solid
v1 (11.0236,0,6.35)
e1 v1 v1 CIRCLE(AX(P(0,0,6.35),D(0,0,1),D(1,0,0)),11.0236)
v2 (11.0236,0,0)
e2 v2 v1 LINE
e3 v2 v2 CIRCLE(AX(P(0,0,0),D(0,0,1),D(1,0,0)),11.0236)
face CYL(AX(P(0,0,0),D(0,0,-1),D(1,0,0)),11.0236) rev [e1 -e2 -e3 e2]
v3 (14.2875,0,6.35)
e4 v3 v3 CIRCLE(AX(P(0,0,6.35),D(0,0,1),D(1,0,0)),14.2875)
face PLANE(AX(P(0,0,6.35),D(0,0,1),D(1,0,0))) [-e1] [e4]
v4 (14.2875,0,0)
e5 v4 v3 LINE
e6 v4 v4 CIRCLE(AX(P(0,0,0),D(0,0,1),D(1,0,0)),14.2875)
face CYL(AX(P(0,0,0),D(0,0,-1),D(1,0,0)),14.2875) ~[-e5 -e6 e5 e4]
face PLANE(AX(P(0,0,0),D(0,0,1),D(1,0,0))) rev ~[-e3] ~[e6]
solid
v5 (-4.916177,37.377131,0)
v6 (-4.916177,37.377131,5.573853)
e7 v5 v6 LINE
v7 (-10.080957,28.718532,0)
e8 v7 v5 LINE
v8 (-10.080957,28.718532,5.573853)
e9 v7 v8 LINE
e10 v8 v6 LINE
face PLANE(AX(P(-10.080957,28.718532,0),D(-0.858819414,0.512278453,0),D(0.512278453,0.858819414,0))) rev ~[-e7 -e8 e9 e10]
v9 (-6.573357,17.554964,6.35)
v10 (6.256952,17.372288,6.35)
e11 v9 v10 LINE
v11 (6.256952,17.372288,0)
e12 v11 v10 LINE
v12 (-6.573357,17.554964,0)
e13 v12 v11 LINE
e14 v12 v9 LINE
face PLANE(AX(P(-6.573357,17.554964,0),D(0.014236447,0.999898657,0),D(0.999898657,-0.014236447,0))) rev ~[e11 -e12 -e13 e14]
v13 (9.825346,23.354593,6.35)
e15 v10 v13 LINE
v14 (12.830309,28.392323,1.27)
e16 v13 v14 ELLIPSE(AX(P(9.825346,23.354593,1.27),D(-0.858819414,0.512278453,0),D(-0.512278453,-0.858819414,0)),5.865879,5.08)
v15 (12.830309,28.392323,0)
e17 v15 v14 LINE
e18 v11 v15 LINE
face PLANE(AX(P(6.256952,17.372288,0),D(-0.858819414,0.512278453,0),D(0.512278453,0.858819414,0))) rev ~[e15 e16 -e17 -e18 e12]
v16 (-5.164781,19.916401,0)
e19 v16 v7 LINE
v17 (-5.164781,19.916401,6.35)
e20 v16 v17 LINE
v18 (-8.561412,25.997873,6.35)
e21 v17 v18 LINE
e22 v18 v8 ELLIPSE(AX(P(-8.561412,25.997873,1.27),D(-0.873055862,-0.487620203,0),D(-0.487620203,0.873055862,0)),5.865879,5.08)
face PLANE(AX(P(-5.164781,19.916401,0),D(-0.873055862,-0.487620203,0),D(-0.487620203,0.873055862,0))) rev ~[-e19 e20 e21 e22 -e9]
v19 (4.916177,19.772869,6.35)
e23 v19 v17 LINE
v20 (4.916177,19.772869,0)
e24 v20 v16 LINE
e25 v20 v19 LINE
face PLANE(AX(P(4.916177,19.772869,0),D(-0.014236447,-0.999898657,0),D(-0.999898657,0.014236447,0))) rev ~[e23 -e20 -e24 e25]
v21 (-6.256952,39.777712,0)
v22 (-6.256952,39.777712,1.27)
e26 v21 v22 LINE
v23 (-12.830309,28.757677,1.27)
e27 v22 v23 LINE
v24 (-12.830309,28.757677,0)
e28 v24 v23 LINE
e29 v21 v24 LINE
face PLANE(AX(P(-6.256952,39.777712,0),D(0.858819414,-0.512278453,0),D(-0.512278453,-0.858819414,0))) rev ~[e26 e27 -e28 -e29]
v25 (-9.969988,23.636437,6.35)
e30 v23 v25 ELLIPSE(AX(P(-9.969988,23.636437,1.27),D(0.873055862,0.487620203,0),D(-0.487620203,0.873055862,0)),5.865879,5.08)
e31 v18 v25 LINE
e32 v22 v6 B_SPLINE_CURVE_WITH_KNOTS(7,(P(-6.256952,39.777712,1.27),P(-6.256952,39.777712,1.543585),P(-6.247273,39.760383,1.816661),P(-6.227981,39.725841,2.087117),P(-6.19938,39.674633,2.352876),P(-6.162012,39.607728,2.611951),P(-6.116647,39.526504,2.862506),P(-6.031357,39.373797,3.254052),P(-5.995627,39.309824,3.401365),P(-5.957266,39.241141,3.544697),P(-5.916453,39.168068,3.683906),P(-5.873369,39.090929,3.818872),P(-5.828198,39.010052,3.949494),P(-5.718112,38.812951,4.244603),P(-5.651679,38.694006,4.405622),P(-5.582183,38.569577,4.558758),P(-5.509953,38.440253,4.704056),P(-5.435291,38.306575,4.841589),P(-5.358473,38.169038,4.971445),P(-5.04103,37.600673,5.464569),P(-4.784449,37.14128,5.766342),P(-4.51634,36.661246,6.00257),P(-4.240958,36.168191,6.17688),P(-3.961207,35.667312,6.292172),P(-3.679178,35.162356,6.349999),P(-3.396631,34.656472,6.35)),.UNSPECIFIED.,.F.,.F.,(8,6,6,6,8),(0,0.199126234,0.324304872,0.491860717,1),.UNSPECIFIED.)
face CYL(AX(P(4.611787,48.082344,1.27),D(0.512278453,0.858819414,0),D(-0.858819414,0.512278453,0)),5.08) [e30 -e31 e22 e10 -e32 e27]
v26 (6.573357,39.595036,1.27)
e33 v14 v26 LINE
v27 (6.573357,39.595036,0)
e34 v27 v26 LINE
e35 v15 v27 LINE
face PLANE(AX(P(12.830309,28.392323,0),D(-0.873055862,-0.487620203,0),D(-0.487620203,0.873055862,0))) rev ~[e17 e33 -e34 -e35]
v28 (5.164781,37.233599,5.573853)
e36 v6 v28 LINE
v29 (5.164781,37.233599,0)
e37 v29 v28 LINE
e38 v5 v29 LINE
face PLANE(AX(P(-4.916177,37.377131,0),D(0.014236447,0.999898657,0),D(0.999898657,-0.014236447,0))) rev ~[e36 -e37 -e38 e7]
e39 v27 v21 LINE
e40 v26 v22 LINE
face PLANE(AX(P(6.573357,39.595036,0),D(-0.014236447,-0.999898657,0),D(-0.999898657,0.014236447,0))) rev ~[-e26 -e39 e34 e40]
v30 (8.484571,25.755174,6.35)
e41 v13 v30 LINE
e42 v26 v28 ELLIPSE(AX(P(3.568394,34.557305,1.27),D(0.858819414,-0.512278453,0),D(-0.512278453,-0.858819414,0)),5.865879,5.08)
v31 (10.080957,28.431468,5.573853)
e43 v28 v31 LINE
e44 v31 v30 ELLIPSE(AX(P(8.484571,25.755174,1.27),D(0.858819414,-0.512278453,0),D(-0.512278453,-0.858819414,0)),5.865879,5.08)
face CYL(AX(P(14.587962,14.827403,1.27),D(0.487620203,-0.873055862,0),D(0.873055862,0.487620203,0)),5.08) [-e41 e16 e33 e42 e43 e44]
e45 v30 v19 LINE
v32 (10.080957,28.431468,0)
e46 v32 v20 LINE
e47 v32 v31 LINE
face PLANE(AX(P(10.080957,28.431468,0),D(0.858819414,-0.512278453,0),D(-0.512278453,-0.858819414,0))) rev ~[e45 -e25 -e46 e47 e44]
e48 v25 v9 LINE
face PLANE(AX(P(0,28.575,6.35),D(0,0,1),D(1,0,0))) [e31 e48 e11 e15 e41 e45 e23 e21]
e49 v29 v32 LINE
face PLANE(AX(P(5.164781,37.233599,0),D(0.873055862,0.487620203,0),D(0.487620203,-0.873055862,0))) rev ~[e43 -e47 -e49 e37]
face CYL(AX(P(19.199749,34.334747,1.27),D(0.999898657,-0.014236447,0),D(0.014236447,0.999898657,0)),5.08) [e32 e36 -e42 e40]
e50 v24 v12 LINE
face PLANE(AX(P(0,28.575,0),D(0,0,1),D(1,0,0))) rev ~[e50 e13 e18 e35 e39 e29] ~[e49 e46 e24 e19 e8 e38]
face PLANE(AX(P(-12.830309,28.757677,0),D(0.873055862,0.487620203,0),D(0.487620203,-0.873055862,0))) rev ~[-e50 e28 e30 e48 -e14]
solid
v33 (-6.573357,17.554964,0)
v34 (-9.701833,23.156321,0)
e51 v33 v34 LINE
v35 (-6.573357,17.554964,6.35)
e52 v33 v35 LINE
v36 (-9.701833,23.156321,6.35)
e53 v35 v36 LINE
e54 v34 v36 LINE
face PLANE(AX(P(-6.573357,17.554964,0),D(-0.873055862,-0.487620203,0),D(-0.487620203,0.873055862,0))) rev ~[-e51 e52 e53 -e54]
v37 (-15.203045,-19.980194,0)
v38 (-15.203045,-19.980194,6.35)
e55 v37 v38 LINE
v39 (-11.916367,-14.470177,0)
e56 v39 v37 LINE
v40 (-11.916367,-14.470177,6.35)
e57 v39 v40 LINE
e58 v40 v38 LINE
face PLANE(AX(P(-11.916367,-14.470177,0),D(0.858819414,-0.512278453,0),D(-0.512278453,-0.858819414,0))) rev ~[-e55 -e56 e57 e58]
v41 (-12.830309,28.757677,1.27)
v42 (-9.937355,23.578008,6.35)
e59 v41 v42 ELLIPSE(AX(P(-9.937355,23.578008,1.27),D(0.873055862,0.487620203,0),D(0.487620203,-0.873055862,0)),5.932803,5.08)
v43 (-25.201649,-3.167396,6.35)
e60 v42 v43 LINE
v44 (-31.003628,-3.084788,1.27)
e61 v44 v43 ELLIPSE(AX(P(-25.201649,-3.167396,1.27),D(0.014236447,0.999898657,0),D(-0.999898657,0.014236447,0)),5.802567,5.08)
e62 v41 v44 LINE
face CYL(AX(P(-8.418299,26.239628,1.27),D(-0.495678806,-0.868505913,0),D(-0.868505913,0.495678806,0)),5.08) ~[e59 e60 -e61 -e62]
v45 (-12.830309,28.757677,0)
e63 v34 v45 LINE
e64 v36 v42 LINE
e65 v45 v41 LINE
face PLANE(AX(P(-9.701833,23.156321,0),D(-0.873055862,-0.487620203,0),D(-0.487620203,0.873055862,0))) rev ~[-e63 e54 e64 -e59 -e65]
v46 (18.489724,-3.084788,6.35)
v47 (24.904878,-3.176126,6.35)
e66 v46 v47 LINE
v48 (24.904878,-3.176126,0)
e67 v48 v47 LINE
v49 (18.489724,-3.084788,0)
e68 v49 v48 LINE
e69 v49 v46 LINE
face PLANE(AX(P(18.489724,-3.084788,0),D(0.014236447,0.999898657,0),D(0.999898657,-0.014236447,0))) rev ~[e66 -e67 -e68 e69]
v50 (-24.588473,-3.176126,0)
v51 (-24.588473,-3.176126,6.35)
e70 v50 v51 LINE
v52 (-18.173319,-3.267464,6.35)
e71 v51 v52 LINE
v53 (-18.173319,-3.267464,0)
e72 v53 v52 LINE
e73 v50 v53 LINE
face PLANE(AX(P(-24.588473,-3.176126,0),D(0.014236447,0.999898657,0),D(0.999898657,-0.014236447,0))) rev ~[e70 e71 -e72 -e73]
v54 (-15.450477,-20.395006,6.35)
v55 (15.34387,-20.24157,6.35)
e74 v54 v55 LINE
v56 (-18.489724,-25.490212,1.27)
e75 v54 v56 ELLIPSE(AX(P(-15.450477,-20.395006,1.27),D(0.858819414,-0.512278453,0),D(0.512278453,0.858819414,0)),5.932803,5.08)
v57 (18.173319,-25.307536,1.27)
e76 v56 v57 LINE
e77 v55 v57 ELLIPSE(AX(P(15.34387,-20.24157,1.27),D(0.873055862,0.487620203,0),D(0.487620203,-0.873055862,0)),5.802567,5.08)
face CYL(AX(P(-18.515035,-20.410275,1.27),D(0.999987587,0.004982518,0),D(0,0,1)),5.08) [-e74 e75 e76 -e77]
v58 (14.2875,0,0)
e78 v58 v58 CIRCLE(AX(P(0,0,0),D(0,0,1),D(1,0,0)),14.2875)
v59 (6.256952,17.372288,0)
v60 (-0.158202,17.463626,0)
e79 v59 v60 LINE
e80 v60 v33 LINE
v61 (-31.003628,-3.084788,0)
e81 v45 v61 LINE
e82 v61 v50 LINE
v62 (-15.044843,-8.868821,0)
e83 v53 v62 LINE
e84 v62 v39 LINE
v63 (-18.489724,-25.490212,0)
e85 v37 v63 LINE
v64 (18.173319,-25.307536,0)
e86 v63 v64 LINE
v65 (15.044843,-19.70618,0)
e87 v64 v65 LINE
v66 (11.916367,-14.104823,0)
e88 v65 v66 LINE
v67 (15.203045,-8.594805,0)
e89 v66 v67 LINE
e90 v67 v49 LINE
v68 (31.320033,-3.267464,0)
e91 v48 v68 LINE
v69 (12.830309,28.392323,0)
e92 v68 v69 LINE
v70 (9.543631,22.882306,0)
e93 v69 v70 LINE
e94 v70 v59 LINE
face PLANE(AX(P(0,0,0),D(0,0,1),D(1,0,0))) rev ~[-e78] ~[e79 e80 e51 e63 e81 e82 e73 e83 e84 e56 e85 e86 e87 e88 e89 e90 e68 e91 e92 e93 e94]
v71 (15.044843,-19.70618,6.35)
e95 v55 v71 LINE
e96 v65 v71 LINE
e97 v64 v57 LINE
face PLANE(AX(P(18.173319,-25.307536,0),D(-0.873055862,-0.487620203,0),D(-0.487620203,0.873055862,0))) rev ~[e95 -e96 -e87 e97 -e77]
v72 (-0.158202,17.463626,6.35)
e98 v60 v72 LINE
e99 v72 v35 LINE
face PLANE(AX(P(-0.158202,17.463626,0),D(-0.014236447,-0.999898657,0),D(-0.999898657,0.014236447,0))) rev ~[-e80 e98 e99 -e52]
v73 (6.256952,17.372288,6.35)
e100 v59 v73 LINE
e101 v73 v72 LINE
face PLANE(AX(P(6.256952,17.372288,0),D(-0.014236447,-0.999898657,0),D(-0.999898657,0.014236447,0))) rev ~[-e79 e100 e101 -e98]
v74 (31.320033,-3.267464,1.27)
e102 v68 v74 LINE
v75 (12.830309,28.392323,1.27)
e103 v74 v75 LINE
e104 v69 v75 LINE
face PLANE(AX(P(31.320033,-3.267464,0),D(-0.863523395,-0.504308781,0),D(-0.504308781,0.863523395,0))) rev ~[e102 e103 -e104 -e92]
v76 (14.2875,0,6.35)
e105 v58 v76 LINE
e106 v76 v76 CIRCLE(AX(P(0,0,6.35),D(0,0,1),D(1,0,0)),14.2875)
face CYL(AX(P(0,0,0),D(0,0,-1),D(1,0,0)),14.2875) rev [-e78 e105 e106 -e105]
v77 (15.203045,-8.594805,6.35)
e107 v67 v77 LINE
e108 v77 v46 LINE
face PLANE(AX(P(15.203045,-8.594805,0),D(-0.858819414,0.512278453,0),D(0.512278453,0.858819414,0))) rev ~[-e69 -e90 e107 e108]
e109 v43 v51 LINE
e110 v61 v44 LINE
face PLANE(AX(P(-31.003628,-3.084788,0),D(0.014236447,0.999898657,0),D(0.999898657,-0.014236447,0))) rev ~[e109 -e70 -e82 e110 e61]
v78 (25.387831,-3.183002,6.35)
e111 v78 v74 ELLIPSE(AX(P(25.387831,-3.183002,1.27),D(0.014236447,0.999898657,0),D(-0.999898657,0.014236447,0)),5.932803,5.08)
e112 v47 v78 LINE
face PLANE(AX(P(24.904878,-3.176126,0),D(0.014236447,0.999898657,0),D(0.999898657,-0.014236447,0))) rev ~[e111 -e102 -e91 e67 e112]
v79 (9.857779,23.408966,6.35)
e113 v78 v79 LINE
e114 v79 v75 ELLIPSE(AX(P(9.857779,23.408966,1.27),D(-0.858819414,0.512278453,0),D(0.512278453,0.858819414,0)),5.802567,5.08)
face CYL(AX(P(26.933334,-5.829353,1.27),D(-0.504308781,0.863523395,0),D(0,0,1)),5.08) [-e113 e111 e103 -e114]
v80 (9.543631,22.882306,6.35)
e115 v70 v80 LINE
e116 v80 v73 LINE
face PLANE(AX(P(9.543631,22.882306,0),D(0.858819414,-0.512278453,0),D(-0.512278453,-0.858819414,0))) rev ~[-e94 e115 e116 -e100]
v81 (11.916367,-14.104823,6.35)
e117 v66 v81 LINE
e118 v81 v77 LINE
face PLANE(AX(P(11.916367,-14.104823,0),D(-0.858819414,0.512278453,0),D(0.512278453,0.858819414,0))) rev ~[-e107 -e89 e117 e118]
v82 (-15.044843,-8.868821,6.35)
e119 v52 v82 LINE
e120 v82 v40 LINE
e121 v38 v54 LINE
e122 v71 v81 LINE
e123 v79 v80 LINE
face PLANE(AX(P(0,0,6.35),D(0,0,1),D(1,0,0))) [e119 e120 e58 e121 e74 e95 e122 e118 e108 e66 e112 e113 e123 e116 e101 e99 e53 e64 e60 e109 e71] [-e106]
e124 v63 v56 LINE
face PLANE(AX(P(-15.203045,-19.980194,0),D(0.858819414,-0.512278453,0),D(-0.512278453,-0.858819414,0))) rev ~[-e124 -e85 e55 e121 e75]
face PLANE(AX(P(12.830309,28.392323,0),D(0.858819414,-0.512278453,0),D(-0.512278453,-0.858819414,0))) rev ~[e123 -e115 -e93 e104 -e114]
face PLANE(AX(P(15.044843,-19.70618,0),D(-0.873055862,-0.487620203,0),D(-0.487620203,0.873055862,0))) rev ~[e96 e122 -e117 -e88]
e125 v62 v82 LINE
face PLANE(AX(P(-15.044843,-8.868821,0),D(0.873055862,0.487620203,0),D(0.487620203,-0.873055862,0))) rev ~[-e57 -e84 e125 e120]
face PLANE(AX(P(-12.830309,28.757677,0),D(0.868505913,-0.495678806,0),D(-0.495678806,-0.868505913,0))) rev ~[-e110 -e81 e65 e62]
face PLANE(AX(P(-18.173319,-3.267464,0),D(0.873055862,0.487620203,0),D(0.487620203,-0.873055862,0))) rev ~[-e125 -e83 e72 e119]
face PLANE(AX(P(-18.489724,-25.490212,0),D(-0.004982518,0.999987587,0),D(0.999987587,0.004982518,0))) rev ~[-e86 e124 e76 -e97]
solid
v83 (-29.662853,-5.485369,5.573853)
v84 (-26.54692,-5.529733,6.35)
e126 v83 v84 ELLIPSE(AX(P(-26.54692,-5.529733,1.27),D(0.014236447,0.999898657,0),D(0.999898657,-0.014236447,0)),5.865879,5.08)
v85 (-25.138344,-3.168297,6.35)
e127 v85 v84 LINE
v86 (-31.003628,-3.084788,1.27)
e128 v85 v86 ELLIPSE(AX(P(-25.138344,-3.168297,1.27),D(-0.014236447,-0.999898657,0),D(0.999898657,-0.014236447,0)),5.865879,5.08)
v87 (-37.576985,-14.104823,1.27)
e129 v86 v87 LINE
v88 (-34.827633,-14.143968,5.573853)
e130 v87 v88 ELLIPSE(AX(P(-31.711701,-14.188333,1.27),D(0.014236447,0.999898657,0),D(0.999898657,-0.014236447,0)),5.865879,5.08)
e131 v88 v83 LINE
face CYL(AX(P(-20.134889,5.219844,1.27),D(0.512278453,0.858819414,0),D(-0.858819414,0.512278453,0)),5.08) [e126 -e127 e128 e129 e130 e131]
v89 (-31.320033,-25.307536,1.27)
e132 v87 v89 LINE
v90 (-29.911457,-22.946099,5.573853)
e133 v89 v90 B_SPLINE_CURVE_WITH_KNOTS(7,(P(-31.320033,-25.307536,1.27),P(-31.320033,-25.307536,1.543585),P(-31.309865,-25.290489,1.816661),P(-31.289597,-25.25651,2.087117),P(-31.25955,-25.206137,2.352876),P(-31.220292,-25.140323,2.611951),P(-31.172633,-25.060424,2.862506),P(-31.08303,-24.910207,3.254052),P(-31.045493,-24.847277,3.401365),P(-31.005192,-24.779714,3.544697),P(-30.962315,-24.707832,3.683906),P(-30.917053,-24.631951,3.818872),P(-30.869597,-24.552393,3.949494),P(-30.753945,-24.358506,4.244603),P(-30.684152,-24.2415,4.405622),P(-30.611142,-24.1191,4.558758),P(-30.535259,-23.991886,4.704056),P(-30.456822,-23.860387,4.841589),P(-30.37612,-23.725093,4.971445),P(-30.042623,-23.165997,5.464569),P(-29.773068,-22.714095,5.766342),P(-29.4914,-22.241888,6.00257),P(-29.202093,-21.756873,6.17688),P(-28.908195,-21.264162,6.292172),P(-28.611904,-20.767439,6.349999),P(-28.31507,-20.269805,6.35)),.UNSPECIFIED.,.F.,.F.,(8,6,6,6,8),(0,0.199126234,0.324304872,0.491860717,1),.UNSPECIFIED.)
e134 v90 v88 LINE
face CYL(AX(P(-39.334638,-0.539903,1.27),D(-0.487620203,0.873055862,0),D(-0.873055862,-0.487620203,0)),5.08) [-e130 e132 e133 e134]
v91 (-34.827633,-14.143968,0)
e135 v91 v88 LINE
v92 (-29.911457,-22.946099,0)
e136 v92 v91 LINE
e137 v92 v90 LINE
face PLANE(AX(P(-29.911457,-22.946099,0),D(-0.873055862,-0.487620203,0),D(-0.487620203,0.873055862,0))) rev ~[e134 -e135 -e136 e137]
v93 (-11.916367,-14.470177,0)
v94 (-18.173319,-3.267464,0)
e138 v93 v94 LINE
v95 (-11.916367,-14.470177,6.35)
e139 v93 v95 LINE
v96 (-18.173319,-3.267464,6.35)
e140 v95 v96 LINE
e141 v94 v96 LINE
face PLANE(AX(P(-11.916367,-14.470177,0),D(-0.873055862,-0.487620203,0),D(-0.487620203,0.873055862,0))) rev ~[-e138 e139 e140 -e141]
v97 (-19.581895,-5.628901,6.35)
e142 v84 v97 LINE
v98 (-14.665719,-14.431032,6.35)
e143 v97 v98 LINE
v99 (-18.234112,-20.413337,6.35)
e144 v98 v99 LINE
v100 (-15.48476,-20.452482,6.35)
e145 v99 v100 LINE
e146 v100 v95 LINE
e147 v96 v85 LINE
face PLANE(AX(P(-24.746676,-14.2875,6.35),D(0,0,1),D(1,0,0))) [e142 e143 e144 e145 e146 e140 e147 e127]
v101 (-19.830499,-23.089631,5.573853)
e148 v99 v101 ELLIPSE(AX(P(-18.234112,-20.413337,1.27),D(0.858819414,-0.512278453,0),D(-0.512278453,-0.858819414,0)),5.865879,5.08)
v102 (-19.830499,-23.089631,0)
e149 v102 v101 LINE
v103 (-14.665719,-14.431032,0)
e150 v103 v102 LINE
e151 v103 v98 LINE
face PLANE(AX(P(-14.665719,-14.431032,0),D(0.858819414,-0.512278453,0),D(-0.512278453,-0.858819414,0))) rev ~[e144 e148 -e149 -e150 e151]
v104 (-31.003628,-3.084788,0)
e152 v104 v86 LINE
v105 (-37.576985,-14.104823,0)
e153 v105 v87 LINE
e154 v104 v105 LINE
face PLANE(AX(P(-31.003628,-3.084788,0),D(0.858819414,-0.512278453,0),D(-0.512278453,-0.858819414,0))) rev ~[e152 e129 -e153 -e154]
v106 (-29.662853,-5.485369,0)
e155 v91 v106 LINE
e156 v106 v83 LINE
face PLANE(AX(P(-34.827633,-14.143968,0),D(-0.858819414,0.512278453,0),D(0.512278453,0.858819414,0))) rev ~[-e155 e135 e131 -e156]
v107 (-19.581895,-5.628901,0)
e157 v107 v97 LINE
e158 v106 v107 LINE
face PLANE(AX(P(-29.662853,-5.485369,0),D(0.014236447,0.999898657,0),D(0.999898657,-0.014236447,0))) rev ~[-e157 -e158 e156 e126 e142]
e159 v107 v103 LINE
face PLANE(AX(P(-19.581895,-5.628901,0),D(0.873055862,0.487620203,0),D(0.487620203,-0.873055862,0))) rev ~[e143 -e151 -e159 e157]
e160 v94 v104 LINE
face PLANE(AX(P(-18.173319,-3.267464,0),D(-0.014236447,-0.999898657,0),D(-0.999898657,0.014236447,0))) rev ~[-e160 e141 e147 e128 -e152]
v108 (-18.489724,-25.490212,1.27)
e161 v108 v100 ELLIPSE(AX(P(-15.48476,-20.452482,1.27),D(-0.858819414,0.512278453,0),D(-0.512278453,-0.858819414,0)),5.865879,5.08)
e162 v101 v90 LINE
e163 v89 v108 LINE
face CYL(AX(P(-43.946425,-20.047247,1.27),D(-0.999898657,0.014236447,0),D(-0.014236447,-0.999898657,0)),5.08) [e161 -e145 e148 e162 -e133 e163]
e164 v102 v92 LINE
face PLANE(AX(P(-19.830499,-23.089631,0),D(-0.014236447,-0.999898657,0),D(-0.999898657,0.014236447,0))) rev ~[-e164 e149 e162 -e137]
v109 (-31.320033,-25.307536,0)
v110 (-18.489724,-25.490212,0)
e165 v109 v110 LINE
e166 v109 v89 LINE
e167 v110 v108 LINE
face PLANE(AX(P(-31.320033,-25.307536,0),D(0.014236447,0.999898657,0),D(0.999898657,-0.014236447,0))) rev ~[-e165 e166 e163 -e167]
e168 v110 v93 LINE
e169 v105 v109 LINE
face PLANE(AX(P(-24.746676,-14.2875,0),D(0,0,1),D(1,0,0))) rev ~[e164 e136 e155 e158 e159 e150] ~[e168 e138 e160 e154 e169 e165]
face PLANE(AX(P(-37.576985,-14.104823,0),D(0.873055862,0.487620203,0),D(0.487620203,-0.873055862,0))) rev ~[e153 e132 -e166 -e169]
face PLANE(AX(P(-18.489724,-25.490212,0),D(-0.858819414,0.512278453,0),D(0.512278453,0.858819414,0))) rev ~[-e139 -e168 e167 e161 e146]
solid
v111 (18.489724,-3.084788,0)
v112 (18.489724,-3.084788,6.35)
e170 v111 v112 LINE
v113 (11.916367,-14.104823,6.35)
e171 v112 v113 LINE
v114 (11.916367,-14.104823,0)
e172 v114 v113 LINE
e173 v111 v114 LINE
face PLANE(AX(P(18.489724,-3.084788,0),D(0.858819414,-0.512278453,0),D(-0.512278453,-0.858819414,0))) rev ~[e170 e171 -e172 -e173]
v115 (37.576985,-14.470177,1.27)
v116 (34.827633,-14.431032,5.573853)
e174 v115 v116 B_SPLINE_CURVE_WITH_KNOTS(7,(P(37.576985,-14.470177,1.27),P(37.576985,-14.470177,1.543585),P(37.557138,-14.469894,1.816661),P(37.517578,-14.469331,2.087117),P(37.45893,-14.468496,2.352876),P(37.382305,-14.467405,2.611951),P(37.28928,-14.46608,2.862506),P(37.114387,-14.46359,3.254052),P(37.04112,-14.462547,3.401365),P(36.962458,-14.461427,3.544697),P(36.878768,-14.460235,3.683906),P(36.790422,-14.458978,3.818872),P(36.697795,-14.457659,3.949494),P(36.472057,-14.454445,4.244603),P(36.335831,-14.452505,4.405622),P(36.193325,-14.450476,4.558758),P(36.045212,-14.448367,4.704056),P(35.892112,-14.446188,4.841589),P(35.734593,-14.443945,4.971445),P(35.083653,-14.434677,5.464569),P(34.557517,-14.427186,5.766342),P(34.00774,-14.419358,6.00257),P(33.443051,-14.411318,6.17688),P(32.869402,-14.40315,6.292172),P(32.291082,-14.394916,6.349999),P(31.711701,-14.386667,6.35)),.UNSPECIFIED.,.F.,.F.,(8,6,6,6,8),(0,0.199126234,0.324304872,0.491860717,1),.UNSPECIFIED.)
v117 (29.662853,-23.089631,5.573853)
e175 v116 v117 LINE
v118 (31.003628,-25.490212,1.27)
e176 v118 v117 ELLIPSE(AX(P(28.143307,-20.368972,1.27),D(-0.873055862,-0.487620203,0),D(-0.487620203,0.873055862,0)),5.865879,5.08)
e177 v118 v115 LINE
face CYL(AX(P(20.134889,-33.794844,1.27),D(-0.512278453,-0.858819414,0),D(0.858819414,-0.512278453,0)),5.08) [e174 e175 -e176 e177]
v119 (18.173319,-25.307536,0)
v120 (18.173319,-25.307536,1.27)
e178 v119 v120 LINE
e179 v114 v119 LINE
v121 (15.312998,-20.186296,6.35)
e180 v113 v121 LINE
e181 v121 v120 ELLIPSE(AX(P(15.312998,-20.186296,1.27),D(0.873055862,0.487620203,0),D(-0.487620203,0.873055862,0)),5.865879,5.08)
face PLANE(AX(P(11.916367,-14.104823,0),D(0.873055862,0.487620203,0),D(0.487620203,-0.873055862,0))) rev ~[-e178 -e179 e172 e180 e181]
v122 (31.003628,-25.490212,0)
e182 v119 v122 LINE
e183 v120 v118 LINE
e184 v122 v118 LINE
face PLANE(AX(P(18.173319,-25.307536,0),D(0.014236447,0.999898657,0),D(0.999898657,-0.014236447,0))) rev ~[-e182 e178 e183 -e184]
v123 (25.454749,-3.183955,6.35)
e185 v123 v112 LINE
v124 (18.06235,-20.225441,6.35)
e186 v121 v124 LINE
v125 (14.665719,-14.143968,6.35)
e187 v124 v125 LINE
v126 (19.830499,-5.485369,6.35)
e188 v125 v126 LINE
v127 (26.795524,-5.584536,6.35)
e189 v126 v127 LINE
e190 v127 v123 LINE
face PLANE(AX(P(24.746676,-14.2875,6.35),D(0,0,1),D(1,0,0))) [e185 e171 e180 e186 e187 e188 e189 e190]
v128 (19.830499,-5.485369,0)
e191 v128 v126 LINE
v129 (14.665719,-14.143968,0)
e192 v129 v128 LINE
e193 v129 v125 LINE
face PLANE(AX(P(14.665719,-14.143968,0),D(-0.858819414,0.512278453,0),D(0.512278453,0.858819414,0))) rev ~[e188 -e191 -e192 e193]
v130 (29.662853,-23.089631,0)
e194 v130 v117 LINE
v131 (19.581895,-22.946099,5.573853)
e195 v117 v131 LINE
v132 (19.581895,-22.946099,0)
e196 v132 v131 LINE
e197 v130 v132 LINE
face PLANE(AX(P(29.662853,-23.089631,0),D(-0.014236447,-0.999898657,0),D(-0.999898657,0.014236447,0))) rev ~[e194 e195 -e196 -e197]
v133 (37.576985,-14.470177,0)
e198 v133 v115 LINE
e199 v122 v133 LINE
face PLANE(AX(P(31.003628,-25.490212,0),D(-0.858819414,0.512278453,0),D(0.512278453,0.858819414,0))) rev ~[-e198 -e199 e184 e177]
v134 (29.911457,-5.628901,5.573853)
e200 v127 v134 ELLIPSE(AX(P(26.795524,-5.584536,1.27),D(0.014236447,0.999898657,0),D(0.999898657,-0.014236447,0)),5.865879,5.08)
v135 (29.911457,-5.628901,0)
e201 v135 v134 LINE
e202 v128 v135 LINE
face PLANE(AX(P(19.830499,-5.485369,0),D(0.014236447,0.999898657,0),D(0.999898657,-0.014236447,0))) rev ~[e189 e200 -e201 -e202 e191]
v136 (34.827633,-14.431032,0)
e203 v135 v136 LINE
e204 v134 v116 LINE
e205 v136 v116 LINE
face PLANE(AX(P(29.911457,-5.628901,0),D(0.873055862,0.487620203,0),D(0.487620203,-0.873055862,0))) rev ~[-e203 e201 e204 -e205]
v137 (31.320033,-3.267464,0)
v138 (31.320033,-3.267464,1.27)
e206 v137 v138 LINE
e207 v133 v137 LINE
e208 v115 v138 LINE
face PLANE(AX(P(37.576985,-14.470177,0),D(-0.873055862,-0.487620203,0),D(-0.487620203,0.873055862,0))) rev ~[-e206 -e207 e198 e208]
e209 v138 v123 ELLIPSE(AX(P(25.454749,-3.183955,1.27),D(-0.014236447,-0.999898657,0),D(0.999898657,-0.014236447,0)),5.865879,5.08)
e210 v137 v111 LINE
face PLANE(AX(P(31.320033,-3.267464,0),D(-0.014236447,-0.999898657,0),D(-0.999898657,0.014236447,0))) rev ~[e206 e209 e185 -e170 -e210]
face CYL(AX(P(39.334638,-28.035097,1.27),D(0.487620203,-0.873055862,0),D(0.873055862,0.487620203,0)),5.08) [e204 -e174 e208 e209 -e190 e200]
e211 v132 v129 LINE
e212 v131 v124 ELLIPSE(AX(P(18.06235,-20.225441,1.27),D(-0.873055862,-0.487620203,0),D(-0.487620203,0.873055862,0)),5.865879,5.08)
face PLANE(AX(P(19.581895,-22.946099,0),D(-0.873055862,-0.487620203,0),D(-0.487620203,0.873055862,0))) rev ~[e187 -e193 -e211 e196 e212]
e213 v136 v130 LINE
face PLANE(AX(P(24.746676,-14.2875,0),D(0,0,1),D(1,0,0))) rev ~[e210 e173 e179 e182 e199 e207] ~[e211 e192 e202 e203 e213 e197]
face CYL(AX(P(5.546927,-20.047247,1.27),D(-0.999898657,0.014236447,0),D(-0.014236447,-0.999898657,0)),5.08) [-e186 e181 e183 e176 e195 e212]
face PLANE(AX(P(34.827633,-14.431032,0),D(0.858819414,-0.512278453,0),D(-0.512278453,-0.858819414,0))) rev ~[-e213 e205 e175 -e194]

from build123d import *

# Parameters (mm, degrees)
F1_R          = 14.2875
F2_DEPTH      = 6.35
F0_R          = 14.2875
F0_R_2        = 11.0236
F3_T1_DEPTH   = 38.2316097327
F3_T3_DEPTH   = 38.2316097327
F3_T5_DEPTH   = 38.2316097327
F3_2_F1_R     = 5.08
F3_2_F2_R     = 5.08
F3_2_F3_R     = 5.08
F3_3_T1_DEPTH = 38.2316097327
F3_3_T3_DEPTH = 38.2316097327
F3_3_T5_DEPTH = 38.2316097327
F3_4_T1_DEPTH = 38.2316097327
F3_4_T3_DEPTH = 38.2316097327
F3_4_T5_DEPTH = 38.2316097327


# Not quite as in the source:
# - a fillet or chamfer that OpenCascade refuses, or shapes differently, is made with other operations: its cross-section is extruded or revolved along the edge and cut away or added


with BuildPart() as f2:
    # F1 (on Top) → F2 (new body)
    with BuildSketch(Plane.XY):
        Polygon((12.8303093344, 28.3923234629), (9.543630774, 22.8823057434), (6.2569521454, 17.3722879094), (-0.1582021818, 17.4636261732), (-6.573357189, 17.5549644466), (-9.7018333012, 23.1563205626), (-12.8303093344, 28.7576765371), (-31.0036280585, -3.0847879094), (-24.5884733182, -3.176126179), (-18.1733187241, -3.2674644466), (-15.0448426119, -8.8688205626), (-11.9163665788, -14.4701765371), (-15.2030451391, -19.9801942566), (-18.4897237678, -25.4902120906), (18.1733187241, -25.3075355534), (15.0448429163, -19.7061799824), (11.9163665788, -14.1048234629), (15.2030453836, -8.5948053335), (18.4897237678, -3.0847879094), (24.9048784863, -3.1761261787), (31.3200331022, -3.2674644466), align=None)
        Circle(F1_R, mode=Mode.SUBTRACT)
    extrude(amount=F2_DEPTH)

    # F3#2: fillet of radius 5.08 on 3 edges, made by hand

    # F3_2_f1
    f3_2_f1_edges = [f2.edges().sort_by_distance(p)[0] for p in [
        (-21.9169686964, 12.8364443138, 6.35),
    ]]
    fillet(f3_2_f1_edges, radius=F3_2_F1_R)

    # F3_2_f2
    f3_2_f2_edges = [f2.edges().sort_by_distance(p)[0] for p in [
        (22.0751712183, 12.5624295081, 6.35),
    ]]
    fillet(f3_2_f2_edges, radius=F3_2_F2_R)

    # F3_2_f3
    f3_2_f3_edges = [f2.edges().sort_by_distance(p)[0] for p in [
        (-0.1582025218, -25.398873822, 6.35),
    ]]
    fillet(f3_2_f3_edges, radius=F3_2_F3_R)


with BuildPart() as f2b:
    # F0 (on Top) → F2, piece 2 (new body)
    with BuildSketch(Plane.XY):
        Polygon((6.2569521454, 17.3722879094), (12.8303093344, 28.3923234629), (6.573357189, 39.5950355534), (-6.2569521454, 39.7777120906), (-12.8303093344, 28.7576765371), (-6.573357189, 17.5549644466), align=None)
        Polygon((5.1647806485, 37.2335993634), (10.0809573342, 28.4314684351), (4.9161766856, 19.7728690717), (-5.1647806485, 19.9164006366), (-10.0809573342, 28.7185315649), (-4.9161766856, 37.3771309283), align=None, mode=Mode.SUBTRACT)
    extrude(amount=F2_DEPTH)

    # F3: fillet of radius 5.08 on 3 edges, made by hand

    # F3_s2 → F3_t1 (cut)
    with BuildSketch(Plane(origin=(22.3643199705, 37.4931095506, 0), x_dir=(0, 0, 1), z_dir=(-0.5122784534, -0.8588194142, 0))):
        with BuildLine():
            ThreePointArc((1.27, 25.750856807), (4.8621024484, 24.2629592555), (6.35, 20.670856807))
            Line((6.35, 20.670856807), (6.35, 25.750856807))
            Line((6.35, 25.750856807), (1.27, 25.750856807))
        make_face()
    extrude(amount=F3_T1_DEPTH, mode=Mode.SUBTRACT)

    # F3_s4 → F3_t3 (cut)
    with BuildSketch(Plane(origin=(-2.8436871063, 5.0914578197, 0), x_dir=(0, 0, 1), z_dir=(-0.4876202032, 0.8730558616, 0))):
        with BuildLine():
            ThreePointArc((1.27, 25.0462473067), (4.8621024484, 23.5583497551), (6.35, 19.9662473067))
            Line((6.35, 19.9662473067), (6.35, 25.0462473067))
            Line((6.35, 25.0462473067), (1.27, 25.0462473067))
        make_face()
    extrude(amount=F3_T3_DEPTH, mode=Mode.SUBTRACT)

    # F3_s6 → F3_t5 (cut)
    with BuildSketch(Plane(origin=(18.707102349, -0.2663496715, 0), x_dir=(0, 0, 1), z_dir=(-0.9998986566, 0.0142364474, 0))):
        with BuildLine():
            ThreePointArc((1.27, 39.6846041137), (4.8621024484, 38.1967065621), (6.35, 34.6046041137))
            Line((6.35, 34.6046041137), (6.35, 39.6846041137))
            Line((6.35, 39.6846041137), (1.27, 39.6846041137))
        make_face()
    extrude(amount=F3_T5_DEPTH, mode=Mode.SUBTRACT)


with BuildPart() as f2c:
    # F0 (on Top) → F2, piece 3 (new body)
    with BuildSketch(Plane.XY):
        Circle(F0_R)
        Circle(F0_R_2, mode=Mode.SUBTRACT)
    extrude(amount=F2_DEPTH)


with BuildPart() as f2d:
    # F0 (on Top) → F2, piece 4 (new body)
    with BuildSketch(Plane.XY):
        Polygon((18.4897237678, -3.0847879094), (11.9163665788, -14.1048234629), (18.1733187241, -25.3075355534), (31.0036280585, -25.4902120906), (37.5769852475, -14.4701765371), (31.3200331022, -3.2674644466), align=None)
        Polygon((19.5818952646, -22.9460993634), (14.665718579, -14.1439684351), (19.8304992275, -5.4853690717), (29.9114565617, -5.6289006366), (34.8276332473, -14.4310315649), (29.6628525988, -23.0896309283), align=None, mode=Mode.SUBTRACT)
    extrude(amount=F2_DEPTH)

    # F3#4: fillet of radius 5.08 on 3 edges, made by hand

    # F3_4_s2 → F3_4_t1 (cut)
    with BuildSketch(Plane(origin=(5.8311753673, -0.0830236353, 0), x_dir=(0, 0, 1), z_dir=(0.9998986566, -0.0142364474, 0))):
        with BuildLine():
            ThreePointArc((1.27, 25.0462473067), (4.8621024484, 23.5583497551), (6.35, 19.9662473067))
            Line((6.35, 19.9662473067), (6.35, 25.0462473067))
            Line((6.35, 25.0462473067), (1.27, 25.0462473067))
        make_face()
    extrude(amount=F3_4_T1_DEPTH, mode=Mode.SUBTRACT)

    # F3_4_s4 → F3_4_t3 (cut)
    with BuildSketch(Plane(origin=(-9.5842167564, -16.0676510297, 0), x_dir=(0, 0, 1), z_dir=(0.5122784534, 0.8588194142, 0))):
        with BuildLine():
            ThreePointArc((1.27, 39.6846041137), (4.8621024484, 38.1967065621), (6.35, 34.6046041137))
            Line((6.35, 34.6046041137), (6.35, 39.6846041137))
            Line((6.35, 39.6846041137), (1.27, 39.6846041137))
        make_face()
    extrude(amount=F3_4_T3_DEPTH, mode=Mode.SUBTRACT)

    # F3_4_s6 → F3_4_t5 (cut)
    with BuildSketch(Plane(origin=(21.2878253524, -38.1146240081, 0), x_dir=(0, 0, 1), z_dir=(-0.4876202032, 0.8730558616, 0))):
        with BuildLine():
            ThreePointArc((1.27, 25.750856807), (4.8621024484, 24.2629592555), (6.35, 20.670856807))
            Line((6.35, 20.670856807), (6.35, 25.750856807))
            Line((6.35, 25.750856807), (1.27, 25.750856807))
        make_face()
    extrude(amount=F3_4_T5_DEPTH, mode=Mode.SUBTRACT)


with BuildPart() as f2e:
    # F0 (on Top) → F2, piece 5 (new body)
    with BuildSketch(Plane.XY):
        Polygon((-11.9163665788, -14.4701765371), (-18.1733187241, -3.2674644466), (-31.0036280585, -3.0847879094), (-37.5769852475, -14.1048234629), (-31.3200331022, -25.3075355534), (-18.4897237678, -25.4902120906), align=None)
        Polygon((-29.6628525988, -5.4853690717), (-19.5818952646, -5.6289006366), (-14.665718579, -14.4310315649), (-19.8304992275, -23.0896309283), (-29.9114565617, -22.9460993634), (-34.8276332473, -14.1439684351), align=None, mode=Mode.SUBTRACT)
    extrude(amount=F2_DEPTH)

    # F3#3: fillet of radius 5.08 on 3 edges, made by hand

    # F3_3_s2 → F3_3_t1 (cut)
    with BuildSketch(Plane(origin=(-2.987488261, -5.0084341843, 0), x_dir=(0, 0, 1), z_dir=(-0.5122784534, -0.8588194142, 0))):
        with BuildLine():
            ThreePointArc((1.27, 25.0462473067), (4.8621024484, 23.5583497551), (6.35, 19.9662473067))
            Line((6.35, 19.9662473067), (6.35, 25.0462473067))
            Line((6.35, 25.0462473067), (1.27, 25.0462473067))
        make_face()
    extrude(amount=F3_3_T1_DEPTH, mode=Mode.SUBTRACT)

    # F3_3_s4 → F3_3_t3 (cut)
    with BuildSketch(Plane(origin=(-9.1228855927, 16.3340007012, 0), x_dir=(0, 0, 1), z_dir=(0.4876202032, -0.8730558616, 0))):
        with BuildLine():
            ThreePointArc((1.27, 39.6846041137), (4.8621024484, 38.1967065621), (6.35, 34.6046041137))
            Line((6.35, 34.6046041137), (6.35, 39.6846041137))
            Line((6.35, 39.6846041137), (1.27, 39.6846041137))
        make_face()
    extrude(amount=F3_3_T3_DEPTH, mode=Mode.SUBTRACT)

    # F3_3_s6 → F3_3_t5 (cut)
    with BuildSketch(Plane(origin=(-43.6521453229, 0.6215144576, 0), x_dir=(0, 0, 1), z_dir=(0.9998986566, -0.0142364474, 0))):
        with BuildLine():
            ThreePointArc((1.27, 25.750856807), (4.8621024484, 24.2629592555), (6.35, 20.670856807))
            Line((6.35, 20.670856807), (6.35, 25.750856807))
            Line((6.35, 25.750856807), (1.27, 25.750856807))
        make_face()
    extrude(amount=F3_3_T5_DEPTH, mode=Mode.SUBTRACT)


solid = Compound([f2.part, f2b.part, f2c.part, f2d.part, f2e.part])
